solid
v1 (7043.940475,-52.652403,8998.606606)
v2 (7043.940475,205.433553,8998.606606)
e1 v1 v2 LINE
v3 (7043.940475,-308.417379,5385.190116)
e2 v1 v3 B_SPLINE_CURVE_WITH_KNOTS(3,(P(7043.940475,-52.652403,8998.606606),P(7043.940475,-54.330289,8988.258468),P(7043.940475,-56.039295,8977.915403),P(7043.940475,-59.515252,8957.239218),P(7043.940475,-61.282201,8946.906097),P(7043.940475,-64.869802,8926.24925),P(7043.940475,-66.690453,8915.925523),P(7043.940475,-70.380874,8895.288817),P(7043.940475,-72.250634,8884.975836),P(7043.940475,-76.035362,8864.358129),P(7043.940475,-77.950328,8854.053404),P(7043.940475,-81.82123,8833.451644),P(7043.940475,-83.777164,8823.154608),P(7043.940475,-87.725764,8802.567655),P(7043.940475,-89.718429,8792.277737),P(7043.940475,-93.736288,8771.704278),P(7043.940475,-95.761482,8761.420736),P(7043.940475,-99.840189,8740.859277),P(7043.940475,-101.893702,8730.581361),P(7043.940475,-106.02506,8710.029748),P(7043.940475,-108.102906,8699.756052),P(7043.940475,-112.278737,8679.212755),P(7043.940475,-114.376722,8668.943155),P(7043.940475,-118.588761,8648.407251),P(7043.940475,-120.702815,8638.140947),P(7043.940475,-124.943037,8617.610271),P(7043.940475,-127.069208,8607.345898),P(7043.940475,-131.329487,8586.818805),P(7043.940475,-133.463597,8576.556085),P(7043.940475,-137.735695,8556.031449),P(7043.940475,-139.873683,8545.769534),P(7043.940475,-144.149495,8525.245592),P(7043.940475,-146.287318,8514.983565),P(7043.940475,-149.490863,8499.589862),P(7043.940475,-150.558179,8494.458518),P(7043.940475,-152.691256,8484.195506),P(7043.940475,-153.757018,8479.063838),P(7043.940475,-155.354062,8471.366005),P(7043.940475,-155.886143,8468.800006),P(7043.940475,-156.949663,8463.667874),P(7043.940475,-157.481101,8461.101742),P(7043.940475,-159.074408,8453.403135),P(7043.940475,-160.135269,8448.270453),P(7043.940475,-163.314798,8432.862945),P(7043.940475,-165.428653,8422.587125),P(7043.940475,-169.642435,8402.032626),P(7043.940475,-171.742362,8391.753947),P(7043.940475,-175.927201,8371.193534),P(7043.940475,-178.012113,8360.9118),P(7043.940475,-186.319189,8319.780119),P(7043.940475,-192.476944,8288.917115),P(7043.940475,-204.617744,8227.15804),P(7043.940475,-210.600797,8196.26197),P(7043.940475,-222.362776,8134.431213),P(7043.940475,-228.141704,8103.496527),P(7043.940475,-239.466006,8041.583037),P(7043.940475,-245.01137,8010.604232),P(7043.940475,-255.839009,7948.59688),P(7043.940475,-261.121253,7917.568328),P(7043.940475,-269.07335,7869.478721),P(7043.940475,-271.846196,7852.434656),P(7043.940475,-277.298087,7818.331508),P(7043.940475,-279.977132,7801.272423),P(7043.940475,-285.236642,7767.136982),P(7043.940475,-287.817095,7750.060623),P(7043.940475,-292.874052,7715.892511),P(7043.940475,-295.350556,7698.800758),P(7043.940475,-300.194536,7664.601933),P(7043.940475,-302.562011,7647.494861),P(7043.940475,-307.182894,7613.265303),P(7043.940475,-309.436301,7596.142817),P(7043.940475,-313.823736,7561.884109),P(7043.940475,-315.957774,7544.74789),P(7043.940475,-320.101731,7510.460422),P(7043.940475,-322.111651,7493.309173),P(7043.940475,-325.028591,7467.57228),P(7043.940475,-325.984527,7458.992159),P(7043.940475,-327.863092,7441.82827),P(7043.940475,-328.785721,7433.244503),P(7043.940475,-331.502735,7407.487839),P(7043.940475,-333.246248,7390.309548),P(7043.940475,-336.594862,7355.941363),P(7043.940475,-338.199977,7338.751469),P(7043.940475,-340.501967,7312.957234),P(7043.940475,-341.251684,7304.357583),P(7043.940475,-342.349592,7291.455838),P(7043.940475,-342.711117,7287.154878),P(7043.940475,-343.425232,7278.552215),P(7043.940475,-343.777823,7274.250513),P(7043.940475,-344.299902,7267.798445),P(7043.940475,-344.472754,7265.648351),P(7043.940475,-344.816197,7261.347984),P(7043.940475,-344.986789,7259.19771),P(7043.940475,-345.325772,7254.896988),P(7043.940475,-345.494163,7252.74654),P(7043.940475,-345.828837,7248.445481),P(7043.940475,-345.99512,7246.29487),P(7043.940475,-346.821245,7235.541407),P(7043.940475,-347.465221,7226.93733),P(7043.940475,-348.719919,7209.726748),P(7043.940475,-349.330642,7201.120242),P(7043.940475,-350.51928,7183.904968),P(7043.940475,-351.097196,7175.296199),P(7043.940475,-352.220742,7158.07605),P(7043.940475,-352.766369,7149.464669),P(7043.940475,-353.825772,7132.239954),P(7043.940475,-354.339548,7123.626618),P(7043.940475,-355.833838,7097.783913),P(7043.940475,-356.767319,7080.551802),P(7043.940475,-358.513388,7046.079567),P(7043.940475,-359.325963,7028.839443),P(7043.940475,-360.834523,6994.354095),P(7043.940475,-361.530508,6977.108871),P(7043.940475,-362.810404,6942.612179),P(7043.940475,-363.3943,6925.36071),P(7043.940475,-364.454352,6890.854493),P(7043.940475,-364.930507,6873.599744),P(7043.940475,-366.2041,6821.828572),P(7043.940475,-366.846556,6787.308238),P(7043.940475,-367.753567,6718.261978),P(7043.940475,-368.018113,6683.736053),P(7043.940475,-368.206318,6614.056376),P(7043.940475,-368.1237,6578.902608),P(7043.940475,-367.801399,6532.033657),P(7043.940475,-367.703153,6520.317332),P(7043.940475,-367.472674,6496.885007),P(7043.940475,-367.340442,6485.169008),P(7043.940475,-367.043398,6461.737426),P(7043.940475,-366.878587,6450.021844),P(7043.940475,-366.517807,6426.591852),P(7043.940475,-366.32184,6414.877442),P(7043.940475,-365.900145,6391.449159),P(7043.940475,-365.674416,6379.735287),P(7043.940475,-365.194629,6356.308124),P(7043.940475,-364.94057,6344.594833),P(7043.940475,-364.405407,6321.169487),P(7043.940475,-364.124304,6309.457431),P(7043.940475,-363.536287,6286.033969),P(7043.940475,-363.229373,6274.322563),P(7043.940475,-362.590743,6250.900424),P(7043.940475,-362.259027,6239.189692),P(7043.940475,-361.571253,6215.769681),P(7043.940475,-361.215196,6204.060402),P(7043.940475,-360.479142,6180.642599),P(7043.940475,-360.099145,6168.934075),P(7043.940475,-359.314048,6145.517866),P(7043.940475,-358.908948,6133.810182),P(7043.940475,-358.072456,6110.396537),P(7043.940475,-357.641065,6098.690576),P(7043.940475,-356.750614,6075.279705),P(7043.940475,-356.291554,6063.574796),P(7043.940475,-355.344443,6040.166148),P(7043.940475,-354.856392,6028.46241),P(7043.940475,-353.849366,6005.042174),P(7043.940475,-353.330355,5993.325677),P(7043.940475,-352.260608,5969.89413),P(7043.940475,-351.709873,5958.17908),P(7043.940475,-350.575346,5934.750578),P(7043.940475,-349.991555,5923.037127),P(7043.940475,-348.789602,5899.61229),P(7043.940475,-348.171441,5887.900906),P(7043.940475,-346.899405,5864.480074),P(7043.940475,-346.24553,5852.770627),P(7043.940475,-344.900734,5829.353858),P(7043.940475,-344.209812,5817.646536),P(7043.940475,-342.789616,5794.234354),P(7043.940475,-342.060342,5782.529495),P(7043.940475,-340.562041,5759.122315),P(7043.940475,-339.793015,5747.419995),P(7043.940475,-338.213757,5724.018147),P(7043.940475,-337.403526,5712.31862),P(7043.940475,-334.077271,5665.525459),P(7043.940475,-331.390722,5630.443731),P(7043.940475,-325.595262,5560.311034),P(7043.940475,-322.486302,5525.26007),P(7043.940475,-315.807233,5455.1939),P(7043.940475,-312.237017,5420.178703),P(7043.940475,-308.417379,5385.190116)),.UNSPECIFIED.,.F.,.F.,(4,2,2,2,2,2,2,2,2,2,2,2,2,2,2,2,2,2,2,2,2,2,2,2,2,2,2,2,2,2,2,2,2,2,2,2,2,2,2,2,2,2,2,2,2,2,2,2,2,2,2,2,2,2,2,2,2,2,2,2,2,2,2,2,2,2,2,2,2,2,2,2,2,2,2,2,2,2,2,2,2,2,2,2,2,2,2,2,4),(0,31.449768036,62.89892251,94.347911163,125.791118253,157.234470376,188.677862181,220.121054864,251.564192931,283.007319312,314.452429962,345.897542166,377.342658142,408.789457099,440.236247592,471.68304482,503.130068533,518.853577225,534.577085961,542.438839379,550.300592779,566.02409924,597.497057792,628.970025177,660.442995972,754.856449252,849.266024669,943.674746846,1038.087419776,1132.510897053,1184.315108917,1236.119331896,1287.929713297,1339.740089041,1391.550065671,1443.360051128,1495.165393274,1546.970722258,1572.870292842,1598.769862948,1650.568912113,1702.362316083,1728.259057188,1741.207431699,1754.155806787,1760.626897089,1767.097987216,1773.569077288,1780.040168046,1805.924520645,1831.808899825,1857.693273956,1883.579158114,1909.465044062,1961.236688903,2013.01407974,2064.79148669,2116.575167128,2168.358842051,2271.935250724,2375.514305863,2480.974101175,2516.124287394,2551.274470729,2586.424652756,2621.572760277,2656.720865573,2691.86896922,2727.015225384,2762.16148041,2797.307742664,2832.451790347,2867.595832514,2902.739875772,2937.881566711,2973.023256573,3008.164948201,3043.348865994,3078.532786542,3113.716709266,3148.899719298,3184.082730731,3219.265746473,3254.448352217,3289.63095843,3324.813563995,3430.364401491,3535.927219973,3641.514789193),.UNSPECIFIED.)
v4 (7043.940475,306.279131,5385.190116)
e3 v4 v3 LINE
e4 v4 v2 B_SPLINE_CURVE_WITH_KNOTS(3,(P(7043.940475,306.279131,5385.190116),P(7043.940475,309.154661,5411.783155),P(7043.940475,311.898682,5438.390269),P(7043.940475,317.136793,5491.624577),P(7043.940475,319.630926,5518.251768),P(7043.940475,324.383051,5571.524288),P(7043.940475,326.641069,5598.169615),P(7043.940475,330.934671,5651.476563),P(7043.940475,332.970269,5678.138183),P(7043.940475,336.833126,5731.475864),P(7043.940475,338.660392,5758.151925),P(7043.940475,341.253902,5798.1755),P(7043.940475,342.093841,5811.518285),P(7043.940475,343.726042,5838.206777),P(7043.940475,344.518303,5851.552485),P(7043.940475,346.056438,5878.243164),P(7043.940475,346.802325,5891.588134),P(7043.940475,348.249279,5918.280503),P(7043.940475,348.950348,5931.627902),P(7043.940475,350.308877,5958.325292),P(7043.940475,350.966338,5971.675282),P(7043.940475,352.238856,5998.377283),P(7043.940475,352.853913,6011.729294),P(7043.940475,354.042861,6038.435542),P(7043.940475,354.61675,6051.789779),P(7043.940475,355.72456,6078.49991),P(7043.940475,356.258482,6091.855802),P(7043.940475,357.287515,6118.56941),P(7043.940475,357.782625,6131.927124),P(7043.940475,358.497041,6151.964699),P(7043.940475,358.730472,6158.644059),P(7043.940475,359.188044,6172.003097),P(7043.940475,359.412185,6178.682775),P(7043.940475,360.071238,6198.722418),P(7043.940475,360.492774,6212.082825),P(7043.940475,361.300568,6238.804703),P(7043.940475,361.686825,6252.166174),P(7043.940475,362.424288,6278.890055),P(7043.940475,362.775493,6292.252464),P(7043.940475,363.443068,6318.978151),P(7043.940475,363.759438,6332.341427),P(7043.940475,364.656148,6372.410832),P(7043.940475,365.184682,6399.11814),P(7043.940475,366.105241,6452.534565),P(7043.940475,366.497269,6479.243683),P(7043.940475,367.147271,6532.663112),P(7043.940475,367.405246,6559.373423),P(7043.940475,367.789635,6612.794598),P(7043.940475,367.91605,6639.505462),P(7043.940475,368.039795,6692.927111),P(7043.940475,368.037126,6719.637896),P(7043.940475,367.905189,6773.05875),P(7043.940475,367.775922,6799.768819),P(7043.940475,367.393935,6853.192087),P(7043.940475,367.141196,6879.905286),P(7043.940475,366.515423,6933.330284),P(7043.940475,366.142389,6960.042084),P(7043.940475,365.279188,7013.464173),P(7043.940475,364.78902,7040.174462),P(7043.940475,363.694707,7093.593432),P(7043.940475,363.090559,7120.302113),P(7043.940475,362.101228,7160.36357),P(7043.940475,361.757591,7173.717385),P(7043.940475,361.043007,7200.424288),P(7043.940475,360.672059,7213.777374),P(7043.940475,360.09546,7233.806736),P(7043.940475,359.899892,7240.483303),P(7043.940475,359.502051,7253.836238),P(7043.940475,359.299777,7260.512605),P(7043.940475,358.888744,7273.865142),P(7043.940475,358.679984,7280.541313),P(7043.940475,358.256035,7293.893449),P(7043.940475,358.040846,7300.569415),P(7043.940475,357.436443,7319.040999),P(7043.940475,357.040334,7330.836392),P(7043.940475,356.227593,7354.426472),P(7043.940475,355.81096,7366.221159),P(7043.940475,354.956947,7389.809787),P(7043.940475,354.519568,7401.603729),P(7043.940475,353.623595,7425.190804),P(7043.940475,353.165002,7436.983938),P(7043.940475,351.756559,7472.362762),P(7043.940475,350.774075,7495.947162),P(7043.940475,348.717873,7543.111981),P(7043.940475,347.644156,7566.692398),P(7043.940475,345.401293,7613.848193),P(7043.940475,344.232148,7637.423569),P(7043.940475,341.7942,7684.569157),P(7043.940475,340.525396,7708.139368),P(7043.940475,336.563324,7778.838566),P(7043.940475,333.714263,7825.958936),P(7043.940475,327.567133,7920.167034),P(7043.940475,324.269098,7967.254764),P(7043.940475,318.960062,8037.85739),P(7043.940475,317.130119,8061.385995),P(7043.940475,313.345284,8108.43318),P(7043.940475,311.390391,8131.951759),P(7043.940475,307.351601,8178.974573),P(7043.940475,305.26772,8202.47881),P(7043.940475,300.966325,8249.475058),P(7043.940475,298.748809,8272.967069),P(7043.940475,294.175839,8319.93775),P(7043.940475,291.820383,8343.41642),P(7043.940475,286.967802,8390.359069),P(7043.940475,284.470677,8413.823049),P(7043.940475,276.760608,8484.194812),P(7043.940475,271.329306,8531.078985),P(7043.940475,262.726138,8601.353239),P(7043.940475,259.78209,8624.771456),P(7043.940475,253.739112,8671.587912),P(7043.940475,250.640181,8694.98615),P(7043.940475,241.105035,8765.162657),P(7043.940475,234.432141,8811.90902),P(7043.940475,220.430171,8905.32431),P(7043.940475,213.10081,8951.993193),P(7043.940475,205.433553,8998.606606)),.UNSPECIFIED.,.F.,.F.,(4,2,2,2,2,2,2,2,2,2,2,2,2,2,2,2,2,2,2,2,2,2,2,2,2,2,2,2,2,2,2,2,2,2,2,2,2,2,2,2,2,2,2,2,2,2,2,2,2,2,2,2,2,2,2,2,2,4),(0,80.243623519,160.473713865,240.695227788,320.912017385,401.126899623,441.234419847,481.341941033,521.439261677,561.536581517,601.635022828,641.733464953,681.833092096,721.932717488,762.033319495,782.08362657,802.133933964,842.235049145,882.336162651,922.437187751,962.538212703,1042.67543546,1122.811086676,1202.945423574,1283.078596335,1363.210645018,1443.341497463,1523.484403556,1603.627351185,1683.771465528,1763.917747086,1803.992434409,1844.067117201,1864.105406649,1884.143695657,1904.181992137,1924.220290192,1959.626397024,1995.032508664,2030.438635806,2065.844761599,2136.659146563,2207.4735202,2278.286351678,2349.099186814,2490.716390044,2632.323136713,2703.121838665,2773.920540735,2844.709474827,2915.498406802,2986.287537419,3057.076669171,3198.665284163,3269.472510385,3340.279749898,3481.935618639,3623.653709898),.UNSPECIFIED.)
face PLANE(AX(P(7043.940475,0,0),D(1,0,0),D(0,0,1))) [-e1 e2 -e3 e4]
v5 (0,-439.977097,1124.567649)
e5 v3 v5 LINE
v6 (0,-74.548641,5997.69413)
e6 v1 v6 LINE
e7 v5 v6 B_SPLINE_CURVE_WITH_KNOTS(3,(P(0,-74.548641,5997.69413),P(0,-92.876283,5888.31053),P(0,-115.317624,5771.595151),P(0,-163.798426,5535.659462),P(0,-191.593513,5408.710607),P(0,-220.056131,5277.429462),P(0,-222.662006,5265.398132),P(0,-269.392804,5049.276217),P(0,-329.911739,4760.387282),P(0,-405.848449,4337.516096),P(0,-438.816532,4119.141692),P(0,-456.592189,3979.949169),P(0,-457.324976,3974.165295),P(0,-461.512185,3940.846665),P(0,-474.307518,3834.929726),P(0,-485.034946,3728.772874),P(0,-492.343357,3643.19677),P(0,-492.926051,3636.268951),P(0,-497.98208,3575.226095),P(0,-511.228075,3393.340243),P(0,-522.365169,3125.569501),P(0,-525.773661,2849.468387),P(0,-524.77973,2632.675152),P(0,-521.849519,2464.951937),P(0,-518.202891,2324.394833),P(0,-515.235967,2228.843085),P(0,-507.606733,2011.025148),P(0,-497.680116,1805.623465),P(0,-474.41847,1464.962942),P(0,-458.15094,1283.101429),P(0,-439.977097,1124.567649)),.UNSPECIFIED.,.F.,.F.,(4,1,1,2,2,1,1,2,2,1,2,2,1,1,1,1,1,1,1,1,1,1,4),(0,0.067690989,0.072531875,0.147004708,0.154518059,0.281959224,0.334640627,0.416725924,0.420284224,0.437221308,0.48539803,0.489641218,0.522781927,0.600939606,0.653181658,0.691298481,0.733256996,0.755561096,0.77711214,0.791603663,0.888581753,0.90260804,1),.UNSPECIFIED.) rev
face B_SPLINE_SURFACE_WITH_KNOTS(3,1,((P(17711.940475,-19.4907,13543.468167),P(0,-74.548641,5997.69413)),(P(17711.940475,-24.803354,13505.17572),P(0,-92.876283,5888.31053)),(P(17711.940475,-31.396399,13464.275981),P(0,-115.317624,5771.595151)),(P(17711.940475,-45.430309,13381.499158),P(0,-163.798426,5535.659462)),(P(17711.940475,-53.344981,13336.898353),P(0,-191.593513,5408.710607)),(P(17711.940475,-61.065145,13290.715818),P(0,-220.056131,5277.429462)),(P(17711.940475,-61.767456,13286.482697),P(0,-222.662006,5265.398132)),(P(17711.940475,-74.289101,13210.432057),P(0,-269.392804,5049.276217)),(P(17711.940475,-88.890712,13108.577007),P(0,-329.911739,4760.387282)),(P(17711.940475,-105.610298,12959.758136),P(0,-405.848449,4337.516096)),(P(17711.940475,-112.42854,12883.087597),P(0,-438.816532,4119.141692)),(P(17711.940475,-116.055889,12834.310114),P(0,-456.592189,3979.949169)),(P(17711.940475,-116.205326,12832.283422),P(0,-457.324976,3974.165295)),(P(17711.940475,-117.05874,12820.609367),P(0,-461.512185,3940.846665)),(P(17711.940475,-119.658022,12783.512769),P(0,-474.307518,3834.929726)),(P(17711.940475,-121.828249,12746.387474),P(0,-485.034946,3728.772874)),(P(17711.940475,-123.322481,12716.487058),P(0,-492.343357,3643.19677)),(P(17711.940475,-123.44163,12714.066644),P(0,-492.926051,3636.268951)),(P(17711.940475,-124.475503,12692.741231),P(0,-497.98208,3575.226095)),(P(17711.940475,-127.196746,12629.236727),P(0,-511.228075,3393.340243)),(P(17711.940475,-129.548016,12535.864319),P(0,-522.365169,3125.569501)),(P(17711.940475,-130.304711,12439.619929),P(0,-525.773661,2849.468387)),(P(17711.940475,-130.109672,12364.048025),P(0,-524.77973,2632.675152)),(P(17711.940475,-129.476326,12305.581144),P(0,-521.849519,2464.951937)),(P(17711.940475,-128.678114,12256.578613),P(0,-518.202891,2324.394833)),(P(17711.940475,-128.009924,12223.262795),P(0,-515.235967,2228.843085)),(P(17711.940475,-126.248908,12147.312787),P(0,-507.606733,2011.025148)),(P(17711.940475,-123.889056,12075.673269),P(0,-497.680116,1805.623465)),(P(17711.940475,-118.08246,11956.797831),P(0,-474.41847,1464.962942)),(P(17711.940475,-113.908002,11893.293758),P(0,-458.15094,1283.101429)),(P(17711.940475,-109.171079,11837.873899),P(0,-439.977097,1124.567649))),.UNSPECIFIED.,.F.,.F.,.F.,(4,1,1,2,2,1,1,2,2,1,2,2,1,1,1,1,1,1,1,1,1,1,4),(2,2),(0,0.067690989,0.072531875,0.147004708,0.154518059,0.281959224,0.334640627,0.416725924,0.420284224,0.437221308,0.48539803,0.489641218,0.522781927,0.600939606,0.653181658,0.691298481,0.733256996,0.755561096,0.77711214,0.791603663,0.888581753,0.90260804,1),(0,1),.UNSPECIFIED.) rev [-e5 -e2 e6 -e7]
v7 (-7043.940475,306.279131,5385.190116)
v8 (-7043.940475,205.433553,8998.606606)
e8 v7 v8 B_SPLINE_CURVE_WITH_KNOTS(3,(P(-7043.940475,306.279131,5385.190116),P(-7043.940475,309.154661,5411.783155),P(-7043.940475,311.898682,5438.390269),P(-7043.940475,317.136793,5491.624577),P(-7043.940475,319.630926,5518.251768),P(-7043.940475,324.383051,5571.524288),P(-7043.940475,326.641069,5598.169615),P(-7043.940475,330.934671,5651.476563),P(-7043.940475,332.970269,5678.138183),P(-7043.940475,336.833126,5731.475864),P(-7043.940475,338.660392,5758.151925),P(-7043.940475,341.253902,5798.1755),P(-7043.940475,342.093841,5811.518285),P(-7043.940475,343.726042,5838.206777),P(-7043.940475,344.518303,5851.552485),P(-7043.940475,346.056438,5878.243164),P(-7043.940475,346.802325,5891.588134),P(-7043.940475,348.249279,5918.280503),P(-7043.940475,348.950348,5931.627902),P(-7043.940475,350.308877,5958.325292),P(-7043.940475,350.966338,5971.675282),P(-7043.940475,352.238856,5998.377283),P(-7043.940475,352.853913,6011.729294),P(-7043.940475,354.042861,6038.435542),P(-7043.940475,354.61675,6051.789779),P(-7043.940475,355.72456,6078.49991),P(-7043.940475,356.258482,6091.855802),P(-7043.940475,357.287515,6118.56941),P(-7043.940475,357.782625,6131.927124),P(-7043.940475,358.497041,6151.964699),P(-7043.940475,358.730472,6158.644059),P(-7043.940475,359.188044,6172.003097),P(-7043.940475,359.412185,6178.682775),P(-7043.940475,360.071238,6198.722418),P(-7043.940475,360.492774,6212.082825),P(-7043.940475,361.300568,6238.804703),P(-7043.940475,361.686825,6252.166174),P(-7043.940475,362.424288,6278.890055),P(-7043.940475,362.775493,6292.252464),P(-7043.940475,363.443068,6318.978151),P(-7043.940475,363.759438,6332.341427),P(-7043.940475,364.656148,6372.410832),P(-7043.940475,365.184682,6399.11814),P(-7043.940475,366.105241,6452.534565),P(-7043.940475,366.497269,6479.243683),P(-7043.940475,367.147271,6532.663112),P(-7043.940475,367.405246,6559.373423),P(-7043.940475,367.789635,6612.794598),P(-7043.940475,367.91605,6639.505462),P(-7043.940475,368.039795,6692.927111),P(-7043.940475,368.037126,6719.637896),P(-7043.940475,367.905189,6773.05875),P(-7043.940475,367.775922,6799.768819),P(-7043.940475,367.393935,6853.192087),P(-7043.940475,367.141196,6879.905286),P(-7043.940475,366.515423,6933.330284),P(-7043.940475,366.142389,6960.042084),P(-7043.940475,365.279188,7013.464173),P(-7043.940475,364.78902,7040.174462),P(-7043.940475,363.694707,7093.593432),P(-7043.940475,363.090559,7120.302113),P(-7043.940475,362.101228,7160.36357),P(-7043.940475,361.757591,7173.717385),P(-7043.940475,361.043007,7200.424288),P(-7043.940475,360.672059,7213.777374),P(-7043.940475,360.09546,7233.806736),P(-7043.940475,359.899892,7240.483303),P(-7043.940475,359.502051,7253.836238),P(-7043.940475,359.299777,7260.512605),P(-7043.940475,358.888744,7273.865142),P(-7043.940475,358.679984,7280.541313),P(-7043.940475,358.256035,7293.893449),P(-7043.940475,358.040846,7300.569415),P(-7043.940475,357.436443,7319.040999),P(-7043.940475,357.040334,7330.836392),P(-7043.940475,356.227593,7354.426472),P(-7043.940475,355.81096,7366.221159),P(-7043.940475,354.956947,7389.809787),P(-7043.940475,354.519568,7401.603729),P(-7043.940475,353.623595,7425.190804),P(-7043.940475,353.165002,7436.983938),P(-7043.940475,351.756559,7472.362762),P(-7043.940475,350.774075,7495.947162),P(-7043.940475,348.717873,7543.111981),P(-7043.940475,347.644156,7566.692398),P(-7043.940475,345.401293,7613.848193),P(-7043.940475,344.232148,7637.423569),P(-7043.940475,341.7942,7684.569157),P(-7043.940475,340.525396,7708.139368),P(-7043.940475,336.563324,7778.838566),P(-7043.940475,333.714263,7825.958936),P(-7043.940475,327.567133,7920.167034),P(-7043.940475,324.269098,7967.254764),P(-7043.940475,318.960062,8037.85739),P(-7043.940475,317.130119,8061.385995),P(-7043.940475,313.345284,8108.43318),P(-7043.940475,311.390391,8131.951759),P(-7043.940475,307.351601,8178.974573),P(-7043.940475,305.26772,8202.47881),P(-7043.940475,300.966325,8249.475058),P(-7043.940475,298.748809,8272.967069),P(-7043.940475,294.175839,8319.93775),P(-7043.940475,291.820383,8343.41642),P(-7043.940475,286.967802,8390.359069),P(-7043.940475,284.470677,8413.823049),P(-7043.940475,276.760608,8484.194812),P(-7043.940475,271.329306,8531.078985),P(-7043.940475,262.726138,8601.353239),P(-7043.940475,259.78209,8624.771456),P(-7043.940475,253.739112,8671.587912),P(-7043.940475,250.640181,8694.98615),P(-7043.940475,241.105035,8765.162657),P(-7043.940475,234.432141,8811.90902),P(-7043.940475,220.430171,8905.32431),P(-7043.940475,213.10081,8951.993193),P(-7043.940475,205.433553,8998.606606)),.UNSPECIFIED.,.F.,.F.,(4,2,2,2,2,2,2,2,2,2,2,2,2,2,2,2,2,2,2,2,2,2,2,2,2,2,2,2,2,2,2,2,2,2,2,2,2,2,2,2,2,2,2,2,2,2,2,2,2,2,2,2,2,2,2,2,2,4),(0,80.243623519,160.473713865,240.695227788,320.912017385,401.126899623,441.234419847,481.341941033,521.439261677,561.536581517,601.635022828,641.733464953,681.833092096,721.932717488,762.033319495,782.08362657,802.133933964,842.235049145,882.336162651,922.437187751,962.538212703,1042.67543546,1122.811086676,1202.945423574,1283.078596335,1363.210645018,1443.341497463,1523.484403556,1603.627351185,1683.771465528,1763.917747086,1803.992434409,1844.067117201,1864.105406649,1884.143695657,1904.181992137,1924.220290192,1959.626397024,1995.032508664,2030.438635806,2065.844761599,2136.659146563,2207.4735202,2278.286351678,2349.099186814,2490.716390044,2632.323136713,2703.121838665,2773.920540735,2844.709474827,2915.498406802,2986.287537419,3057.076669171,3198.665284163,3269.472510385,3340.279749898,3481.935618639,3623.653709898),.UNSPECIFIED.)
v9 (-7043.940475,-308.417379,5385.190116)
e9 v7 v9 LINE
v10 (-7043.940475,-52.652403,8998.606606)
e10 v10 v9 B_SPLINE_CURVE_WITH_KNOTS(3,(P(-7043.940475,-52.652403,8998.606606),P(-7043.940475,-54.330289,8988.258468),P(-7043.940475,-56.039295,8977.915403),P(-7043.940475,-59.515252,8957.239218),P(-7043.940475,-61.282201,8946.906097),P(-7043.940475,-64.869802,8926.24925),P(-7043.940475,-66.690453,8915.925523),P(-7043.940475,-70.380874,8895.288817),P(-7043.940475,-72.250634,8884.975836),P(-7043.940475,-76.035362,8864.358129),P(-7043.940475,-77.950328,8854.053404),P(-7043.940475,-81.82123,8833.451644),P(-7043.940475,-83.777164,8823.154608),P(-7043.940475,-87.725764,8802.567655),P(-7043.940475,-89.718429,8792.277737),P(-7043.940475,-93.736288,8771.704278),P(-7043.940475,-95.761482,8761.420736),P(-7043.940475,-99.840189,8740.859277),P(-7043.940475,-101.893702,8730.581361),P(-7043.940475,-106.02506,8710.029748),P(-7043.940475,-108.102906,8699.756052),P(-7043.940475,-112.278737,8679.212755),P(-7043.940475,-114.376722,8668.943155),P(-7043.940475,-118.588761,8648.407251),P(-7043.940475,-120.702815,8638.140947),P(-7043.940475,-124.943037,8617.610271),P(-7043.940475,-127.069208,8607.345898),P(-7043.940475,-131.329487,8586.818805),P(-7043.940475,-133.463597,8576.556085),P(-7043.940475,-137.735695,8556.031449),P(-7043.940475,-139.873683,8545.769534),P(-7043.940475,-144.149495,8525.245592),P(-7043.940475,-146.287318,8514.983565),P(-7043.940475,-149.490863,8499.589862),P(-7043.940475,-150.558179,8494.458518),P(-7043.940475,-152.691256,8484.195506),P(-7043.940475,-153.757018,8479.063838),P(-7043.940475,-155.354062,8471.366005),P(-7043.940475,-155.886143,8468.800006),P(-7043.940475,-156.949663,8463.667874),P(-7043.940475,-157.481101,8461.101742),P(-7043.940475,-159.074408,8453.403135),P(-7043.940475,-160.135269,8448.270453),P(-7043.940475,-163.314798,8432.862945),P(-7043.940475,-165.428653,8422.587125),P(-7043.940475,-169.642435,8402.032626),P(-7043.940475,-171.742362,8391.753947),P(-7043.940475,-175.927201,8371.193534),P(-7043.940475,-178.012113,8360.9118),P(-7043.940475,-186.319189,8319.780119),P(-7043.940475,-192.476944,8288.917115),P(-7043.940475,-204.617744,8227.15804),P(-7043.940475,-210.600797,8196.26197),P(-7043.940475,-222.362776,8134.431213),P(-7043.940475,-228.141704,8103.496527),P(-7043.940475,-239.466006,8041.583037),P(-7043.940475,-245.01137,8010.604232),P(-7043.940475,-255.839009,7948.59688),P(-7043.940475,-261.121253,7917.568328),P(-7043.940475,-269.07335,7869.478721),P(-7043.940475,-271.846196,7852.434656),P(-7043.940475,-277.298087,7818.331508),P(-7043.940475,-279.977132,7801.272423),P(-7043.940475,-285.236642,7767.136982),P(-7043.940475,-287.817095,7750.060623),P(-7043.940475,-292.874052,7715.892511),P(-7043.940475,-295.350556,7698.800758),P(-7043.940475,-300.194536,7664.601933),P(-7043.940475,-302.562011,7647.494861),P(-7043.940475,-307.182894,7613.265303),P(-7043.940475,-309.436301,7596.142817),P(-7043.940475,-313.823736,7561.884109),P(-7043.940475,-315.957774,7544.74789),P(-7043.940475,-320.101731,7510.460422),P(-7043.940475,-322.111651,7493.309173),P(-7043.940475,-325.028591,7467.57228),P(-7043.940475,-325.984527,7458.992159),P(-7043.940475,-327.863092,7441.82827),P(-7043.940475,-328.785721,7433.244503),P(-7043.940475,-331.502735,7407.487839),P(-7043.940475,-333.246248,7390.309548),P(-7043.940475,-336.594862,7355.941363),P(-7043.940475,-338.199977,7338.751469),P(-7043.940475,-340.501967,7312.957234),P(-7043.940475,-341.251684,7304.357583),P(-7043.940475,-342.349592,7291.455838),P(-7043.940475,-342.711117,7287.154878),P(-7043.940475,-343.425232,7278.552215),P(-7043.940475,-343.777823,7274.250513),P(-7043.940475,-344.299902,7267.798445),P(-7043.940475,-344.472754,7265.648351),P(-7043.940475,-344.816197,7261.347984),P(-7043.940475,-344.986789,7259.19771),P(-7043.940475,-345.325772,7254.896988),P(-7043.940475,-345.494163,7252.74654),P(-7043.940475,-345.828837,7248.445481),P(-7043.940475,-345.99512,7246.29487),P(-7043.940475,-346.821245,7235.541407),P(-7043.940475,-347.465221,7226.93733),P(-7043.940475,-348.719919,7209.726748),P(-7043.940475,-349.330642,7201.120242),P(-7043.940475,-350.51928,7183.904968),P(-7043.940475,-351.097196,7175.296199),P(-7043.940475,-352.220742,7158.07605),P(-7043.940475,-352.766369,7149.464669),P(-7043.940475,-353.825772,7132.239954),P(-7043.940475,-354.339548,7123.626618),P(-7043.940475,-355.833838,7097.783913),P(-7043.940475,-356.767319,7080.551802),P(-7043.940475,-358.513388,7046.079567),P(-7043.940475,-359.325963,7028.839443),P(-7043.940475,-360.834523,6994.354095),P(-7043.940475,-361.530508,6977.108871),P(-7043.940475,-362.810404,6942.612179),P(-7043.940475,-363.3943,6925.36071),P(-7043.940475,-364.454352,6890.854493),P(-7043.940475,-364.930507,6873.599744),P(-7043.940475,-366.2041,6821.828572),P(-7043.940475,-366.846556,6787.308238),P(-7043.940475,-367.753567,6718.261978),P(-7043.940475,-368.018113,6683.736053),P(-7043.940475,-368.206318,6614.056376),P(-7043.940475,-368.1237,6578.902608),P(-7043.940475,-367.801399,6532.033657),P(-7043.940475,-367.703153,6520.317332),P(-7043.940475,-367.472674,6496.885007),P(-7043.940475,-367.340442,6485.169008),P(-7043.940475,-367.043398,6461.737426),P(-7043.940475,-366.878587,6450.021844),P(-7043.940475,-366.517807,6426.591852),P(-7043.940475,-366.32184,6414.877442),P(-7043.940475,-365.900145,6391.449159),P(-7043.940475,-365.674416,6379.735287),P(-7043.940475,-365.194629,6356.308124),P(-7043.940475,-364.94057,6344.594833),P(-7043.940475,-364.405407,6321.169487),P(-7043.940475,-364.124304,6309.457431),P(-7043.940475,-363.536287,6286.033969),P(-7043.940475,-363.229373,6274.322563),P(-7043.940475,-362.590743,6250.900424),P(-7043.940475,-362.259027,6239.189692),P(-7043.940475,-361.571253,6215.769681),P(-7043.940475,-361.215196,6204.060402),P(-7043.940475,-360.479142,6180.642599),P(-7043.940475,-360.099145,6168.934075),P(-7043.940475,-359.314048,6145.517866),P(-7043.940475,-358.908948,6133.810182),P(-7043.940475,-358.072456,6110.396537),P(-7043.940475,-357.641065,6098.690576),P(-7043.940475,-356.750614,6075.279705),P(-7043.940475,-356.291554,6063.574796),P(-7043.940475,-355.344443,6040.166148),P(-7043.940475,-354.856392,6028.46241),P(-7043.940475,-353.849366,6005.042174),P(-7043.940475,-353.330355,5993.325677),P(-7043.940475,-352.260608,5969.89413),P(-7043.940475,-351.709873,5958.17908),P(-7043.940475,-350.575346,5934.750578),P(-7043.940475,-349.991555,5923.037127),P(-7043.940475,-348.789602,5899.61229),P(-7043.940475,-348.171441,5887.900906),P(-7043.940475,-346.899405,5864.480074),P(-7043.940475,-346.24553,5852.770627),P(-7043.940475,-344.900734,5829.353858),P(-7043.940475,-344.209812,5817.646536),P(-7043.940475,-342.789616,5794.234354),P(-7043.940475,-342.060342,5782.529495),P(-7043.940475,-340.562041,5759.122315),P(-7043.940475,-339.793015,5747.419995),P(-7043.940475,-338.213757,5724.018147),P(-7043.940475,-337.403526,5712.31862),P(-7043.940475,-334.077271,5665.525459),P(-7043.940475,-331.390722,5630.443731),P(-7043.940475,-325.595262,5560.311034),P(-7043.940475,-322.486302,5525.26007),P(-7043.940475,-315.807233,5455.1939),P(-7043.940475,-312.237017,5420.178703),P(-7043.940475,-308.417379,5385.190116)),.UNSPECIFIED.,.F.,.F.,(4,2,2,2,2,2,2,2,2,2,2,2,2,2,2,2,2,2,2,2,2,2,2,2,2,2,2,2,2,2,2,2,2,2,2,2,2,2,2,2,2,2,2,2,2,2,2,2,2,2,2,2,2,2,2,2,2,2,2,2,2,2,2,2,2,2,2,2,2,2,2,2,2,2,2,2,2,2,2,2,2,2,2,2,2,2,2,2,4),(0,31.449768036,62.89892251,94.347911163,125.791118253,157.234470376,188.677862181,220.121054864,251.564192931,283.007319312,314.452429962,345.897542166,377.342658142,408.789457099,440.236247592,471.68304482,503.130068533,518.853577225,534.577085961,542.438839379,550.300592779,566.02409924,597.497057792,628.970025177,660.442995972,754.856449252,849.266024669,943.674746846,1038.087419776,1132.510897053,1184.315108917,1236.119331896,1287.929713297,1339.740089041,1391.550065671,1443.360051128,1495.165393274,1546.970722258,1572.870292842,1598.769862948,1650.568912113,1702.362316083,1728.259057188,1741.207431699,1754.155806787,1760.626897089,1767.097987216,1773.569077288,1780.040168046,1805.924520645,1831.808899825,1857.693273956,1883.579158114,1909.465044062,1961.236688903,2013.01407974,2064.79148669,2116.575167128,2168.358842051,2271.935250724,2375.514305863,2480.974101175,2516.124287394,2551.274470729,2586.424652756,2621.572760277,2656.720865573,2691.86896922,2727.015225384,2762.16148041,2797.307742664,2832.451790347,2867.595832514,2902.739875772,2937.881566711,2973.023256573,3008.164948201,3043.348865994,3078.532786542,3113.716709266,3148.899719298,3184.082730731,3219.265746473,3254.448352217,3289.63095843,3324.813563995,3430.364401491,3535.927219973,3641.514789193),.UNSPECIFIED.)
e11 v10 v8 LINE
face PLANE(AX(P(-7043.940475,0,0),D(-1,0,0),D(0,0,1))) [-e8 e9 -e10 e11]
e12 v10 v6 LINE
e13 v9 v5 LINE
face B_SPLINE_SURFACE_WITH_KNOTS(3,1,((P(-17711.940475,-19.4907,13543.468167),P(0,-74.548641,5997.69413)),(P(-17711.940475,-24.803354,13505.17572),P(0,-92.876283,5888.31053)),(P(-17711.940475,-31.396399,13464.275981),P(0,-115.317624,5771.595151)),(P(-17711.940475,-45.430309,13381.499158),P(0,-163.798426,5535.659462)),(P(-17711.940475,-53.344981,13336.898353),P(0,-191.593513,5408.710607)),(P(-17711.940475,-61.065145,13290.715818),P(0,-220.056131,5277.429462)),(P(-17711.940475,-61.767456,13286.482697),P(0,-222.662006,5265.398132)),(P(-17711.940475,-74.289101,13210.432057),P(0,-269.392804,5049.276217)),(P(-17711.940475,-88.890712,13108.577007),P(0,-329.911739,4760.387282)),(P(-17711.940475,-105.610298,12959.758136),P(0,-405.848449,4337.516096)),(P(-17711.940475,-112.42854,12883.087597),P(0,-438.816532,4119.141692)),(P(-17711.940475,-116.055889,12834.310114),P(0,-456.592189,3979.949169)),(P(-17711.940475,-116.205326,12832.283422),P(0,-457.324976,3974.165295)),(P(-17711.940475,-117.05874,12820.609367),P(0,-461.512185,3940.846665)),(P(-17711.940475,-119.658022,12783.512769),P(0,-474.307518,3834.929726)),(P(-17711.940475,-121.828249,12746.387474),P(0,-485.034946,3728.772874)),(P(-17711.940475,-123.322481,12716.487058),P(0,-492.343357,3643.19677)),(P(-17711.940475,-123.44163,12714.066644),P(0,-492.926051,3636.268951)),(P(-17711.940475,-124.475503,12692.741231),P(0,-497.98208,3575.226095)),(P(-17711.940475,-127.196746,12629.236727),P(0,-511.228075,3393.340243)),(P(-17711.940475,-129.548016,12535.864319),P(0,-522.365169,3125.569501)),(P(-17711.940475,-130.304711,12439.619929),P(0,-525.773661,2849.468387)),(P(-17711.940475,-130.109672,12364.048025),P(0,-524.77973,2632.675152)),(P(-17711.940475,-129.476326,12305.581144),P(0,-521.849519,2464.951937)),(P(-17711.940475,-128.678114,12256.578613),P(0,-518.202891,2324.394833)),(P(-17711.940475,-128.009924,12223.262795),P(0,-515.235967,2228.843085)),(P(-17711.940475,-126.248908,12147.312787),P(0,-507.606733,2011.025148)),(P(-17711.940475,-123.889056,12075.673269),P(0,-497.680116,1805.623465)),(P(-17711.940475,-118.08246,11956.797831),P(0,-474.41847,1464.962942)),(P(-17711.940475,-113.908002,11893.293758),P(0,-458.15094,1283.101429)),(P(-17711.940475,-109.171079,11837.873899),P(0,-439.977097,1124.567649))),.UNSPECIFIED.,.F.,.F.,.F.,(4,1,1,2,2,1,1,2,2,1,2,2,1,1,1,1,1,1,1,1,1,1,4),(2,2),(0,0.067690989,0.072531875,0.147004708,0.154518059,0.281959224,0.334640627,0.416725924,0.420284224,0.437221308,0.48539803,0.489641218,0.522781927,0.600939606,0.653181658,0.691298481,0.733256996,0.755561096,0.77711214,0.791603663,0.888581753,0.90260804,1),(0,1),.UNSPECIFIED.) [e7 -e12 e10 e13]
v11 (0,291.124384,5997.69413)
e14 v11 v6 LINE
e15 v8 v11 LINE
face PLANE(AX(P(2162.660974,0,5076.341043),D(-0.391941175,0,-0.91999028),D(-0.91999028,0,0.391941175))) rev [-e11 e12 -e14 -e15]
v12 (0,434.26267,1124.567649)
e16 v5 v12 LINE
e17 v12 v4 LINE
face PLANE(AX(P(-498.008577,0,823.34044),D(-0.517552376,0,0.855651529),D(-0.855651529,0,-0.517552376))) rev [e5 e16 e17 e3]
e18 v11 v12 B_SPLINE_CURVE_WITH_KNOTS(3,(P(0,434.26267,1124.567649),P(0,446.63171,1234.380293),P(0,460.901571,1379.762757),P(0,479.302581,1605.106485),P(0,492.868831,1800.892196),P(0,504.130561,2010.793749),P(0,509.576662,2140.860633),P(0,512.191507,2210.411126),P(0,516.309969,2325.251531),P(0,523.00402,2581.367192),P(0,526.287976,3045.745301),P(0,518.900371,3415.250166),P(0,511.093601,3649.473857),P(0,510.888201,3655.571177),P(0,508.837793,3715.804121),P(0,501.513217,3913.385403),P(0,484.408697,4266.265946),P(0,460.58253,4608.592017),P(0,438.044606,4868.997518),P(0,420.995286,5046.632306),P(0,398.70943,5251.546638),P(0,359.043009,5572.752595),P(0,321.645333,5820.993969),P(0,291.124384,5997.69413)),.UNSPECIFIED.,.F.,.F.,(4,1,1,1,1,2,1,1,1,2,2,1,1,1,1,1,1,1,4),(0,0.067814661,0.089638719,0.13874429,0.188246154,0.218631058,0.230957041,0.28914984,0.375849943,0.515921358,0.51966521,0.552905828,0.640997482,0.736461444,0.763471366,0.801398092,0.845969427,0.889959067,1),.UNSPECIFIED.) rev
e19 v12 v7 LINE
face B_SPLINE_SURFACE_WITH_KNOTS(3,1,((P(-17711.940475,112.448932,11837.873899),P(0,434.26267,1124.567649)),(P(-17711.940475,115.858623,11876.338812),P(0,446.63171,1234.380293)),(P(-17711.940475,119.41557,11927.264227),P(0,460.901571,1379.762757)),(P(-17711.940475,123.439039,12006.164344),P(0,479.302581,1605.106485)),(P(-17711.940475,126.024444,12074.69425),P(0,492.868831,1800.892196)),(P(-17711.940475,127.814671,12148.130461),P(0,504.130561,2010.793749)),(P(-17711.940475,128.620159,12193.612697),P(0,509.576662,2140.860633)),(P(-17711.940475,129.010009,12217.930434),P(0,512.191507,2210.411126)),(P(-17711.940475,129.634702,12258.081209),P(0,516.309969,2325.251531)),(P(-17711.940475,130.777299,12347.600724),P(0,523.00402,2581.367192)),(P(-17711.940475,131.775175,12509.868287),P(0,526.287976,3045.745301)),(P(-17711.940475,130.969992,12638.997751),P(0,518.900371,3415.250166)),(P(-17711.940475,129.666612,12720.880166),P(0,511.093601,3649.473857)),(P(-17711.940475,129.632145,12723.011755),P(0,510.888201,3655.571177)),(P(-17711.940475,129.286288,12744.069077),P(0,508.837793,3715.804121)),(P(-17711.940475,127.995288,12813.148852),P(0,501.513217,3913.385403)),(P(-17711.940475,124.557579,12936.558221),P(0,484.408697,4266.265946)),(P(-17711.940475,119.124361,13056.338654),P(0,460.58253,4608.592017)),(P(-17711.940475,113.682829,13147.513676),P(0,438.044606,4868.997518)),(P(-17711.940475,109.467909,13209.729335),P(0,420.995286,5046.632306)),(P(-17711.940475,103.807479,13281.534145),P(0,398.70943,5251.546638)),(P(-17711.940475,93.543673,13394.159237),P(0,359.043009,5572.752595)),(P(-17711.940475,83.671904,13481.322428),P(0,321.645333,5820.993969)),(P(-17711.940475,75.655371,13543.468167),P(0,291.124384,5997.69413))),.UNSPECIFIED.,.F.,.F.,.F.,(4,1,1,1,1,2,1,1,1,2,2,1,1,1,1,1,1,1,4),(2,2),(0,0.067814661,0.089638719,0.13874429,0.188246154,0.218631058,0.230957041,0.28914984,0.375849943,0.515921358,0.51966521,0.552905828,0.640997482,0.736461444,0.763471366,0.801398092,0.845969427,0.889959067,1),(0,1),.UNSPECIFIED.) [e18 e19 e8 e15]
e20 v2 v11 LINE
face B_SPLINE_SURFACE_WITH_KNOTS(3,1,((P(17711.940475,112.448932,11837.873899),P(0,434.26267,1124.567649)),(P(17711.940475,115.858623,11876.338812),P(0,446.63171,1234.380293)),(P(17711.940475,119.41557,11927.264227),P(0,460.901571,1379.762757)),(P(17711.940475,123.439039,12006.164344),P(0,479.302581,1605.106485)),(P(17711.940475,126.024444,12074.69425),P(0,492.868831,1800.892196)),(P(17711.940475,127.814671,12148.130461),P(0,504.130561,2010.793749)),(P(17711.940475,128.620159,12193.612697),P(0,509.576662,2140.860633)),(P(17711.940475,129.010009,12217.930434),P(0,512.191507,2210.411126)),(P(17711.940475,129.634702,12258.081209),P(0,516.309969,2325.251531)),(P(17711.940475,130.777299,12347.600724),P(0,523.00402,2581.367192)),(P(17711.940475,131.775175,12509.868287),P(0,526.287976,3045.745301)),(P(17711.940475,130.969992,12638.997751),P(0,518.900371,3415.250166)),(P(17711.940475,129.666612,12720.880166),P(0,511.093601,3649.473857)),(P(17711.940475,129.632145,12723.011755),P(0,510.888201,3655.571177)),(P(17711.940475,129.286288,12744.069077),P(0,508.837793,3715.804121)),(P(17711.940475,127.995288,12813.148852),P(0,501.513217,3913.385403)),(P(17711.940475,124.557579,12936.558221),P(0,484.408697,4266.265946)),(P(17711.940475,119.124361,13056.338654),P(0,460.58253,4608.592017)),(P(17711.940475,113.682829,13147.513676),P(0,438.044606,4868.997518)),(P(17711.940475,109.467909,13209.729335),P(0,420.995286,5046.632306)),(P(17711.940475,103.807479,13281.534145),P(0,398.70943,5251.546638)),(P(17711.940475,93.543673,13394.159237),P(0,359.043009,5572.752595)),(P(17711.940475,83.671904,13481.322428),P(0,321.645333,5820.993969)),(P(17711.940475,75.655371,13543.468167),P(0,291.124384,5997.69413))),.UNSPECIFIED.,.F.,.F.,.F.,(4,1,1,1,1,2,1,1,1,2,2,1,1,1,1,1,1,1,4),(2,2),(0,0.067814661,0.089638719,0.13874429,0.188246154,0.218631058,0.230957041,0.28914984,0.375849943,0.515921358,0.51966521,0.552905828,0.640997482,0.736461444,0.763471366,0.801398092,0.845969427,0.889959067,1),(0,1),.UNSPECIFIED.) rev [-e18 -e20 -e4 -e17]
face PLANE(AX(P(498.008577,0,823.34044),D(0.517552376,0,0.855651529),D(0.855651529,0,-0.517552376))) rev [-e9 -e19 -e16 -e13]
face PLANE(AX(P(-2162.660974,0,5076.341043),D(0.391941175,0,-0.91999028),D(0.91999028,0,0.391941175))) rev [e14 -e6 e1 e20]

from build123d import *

# Parameters (mm, degrees)
SKETCH4_W          = 217940.907579301
SKETCH4_H          = 93089.135284755
CUT_EXTRUDE1_DEPTH = 10668


with BuildPart() as part:
    # Surface-Knit3: read off the stored shape, not the designer's step
    # Surface-Knit3: loft between two sections, ruled curve by curve
    surface_knit3_from = [
        Edge.make_bspline([(-17711.940475464, -19.490699903, 13543.468166774), (-17711.940475464, -24.803354412, 13505.175719997), (-17711.940475464, -31.396398644, 13464.275981289), (-17711.940475464, -45.430309453, 13381.499157648), (-17711.940475464, -53.344980689, 13336.898353131), (-17711.940475464, -61.065145115, 13290.715817609), (-17711.940475464, -61.767456376, 13286.482697487), (-17711.940475464, -74.289101345, 13210.432056947), (-17711.940475464, -88.890712357, 13108.577006997), (-17711.940475464, -105.610298479, 12959.75813616), (-17711.940475464, -112.428540164, 12883.087596559), (-17711.940475464, -116.055888825, 12834.310114395), (-17711.940475464, -116.205326244, 12832.283421892), (-17711.940475464, -117.058739578, 12820.609367392), (-17711.940475464, -119.658021556, 12783.51276946), (-17711.940475464, -121.828248889, 12746.387473568), (-17711.940475464, -123.322481099, 12716.487057512), (-17711.940475464, -123.44163031, 12714.066644402), (-17711.940475464, -124.475503171, 12692.741231146), (-17711.940475464, -127.196746164, 12629.236726941), (-17711.940475464, -129.548016398, 12535.864319025), (-17711.940475464, -130.304711397, 12439.619928677), (-17711.940475464, -130.109672374, 12364.04802458), (-17711.940475464, -129.476326154, 12305.581144117), (-17711.940475464, -128.678113837, 12256.578612915), (-17711.940475464, -128.009923672, 12223.262795348), (-17711.940475464, -126.248907992, 12147.312787219), (-17711.940475464, -123.889055703, 12075.673268649), (-17711.940475464, -118.082459732, 11956.797831257), (-17711.940475464, -113.908002015, 11893.293757756), (-17711.940475464, -109.171078797, 11837.87389869)], [0, 0, 0, 0, 0.067690989, 0.072531875, 0.147004708, 0.147004708, 0.154518059, 0.154518059, 0.281959224, 0.334640627, 0.416725924, 0.416725924, 0.420284224, 0.420284224, 0.437221308, 0.48539803, 0.48539803, 0.489641218, 0.489641218, 0.522781927, 0.600939606, 0.653181658, 0.691298481, 0.733256996, 0.755561096, 0.77711214, 0.791603663, 0.888581753, 0.90260804, 1, 1, 1, 1], 3),
        Edge.make_bspline([(-17711.940475464, 112.448931944, 11837.87389869), (-17711.940475464, 115.858623311, 11876.338812234), (-17711.940475464, 119.415570244, 11927.264227177), (-17711.940475464, 123.439039127, 12006.164344249), (-17711.940475464, 126.024443681, 12074.694250467), (-17711.940475464, 127.814670989, 12148.130460545), (-17711.940475464, 128.620158562, 12193.612696901), (-17711.940475464, 129.010009381, 12217.930434419), (-17711.940475464, 129.634702387, 12258.081209211), (-17711.940475464, 130.777298991, 12347.600723561), (-17711.940475464, 131.775175378, 12509.868286874), (-17711.940475464, 130.969991963, 12638.99775061), (-17711.940475464, 129.666612166, 12720.880166331), (-17711.940475464, 129.632145327, 12723.011755151), (-17711.940475464, 129.286288491, 12744.069077122), (-17711.940475464, 127.995287538, 12813.148852153), (-17711.940475464, 124.557578721, 12936.558220654), (-17711.940475464, 119.12436106, 13056.338653937), (-17711.940475464, 113.682828529, 13147.513676307), (-17711.940475464, 109.467908518, 13209.729334806), (-17711.940475464, 103.8074791, 13281.534144751), (-17711.940475464, 93.543673458, 13394.159236979), (-17711.940475464, 83.671904107, 13481.322428275), (-17711.940475464, 75.655371215, 13543.468166774)], [0, 0, 0, 0, 0.067814661, 0.089638719, 0.13874429, 0.188246154, 0.218631058, 0.218631058, 0.230957041, 0.28914984, 0.375849943, 0.515921358, 0.515921358, 0.51966521, 0.51966521, 0.552905828, 0.640997482, 0.736461444, 0.763471366, 0.801398092, 0.845969427, 0.889959067, 1, 1, 1, 1], 3),
        Edge.make_line((-17711.940475464, 112.448931944, 11837.87389869), (-17711.940475464, -109.171078797, 11837.87389869)),
        Edge.make_line((-17711.940475464, -19.490699903, 13543.468166774), (-17711.940475464, 75.655371215, 13543.468166774)),
    ]
    surface_knit3_to = [
        Edge.make_bspline([(0, -74.548641103, 5997.694129526), (0, -92.876282917, 5888.310530003), (0, -115.317624049, 5771.595151029), (0, -163.798425653, 5535.659462367), (0, -191.59351315, 5408.710607244), (0, -220.056131458, 5277.429461693), (0, -222.662006122, 5265.398131874), (0, -269.392803808, 5049.276216929), (0, -329.911738534, 4760.387282384), (0, -405.848449007, 4337.516095938), (0, -438.816531993, 4119.141691796), (0, -456.592188962, 3979.949168518), (0, -457.324975774, 3974.165294689), (0, -461.51218458, 3940.846665333), (0, -474.307517862, 3834.929725853), (0, -485.034945558, 3728.772873873), (0, -492.343356759, 3643.196769546), (0, -492.926050751, 3636.268950917), (0, -497.982080071, 3575.226095309), (0, -511.228074838, 3393.340242893), (0, -522.365169387, 3125.569501148), (0, -525.773660709, 2849.468387191), (0, -524.779729774, 2632.675151842), (0, -521.849519313, 2464.95193659), (0, -518.202891169, 2324.394832709), (0, -515.235966946, 2228.843084541), (0, -507.606732796, 2011.025148153), (0, -497.680115772, 1805.623465244), (0, -474.418469864, 1464.962942411), (0, -458.150939984, 1283.101429313), (0, -439.977097141, 1124.567649286)], [0, 0, 0, 0, 0.067690989, 0.072531875, 0.147004708, 0.147004708, 0.154518059, 0.154518059, 0.281959224, 0.334640627, 0.416725924, 0.416725924, 0.420284224, 0.420284224, 0.437221308, 0.48539803, 0.48539803, 0.489641218, 0.489641218, 0.522781927, 0.600939606, 0.653181658, 0.691298481, 0.733256996, 0.755561096, 0.77711214, 0.791603663, 0.888581753, 0.90260804, 1, 1, 1, 1], 3),
        Edge.make_bspline([(0, 434.262669848, 1124.567649286), (0, 446.63171021, 1234.380292573), (0, 460.901570919, 1379.76275731), (0, 479.302580522, 1605.106484751), (0, 492.86883129, 1800.892196295), (0, 504.130561325, 2010.793749301), (0, 509.576661856, 2140.860632533), (0, 512.191507249, 2210.411125812), (0, 516.309968607, 2325.251531297), (0, 523.004020017, 2581.367191943), (0, 526.287976268, 3045.74530127), (0, 518.900370536, 3415.250165612), (0, 511.093601322, 3649.473857333), (0, 510.888200599, 3655.57117725), (0, 508.837793347, 3715.804121181), (0, 501.513216951, 3913.385403224), (0, 484.408696997, 4266.265945864), (0, 460.582530206, 4608.592017012), (0, 438.044605503, 4868.997518035), (0, 420.995286093, 5046.632306258), (0, 398.709430134, 5251.546638341), (0, 359.043008571, 5572.752594931), (0, 321.645333025, 5820.993968722), (0, 291.124383689, 5997.694129526)], [0, 0, 0, 0, 0.067814661, 0.089638719, 0.13874429, 0.188246154, 0.218631058, 0.218631058, 0.230957041, 0.28914984, 0.375849943, 0.515921358, 0.515921358, 0.51966521, 0.51966521, 0.552905828, 0.640997482, 0.736461444, 0.763471366, 0.801398092, 0.845969427, 0.889959067, 1, 1, 1, 1], 3),
        Edge.make_line((0, 434.262669848, 1124.567649286), (0, -439.977097141, 1124.567649286)),
        Edge.make_line((0, -74.548641103, 5997.694129526), (0, 291.124383689, 5997.694129526)),
    ]
    surface_knit3 = Solid(Shell([*[Face.make_surface_from_curves(surface_knit3_from[k], surface_knit3_to[k]) for k in range(4)], Face(Wire(surface_knit3_from)), Face(Wire(surface_knit3_to))]))
    add(surface_knit3)

    # Sketch4 → Cut-Extrude1 (cut)
    with BuildSketch(Plane(origin=(-17711.940475464, 0, 0), x_dir=(0, 0, -1), z_dir=(1, 0, 0))):
        with Locations((-12391.117982578, -2547.446341343)):
            Rectangle(SKETCH4_W, SKETCH4_H)
    extrude(amount=CUT_EXTRUDE1_DEPTH, mode=Mode.SUBTRACT)

    # Mirror1: part across plane


with BuildPart() as part_1:
    add(part.part)
    add(part.part.mirror(Plane(origin=(0, 0, 0), x_dir=(0, 0, 1), z_dir=(1, 0, 0))))


solid = part_1.part
